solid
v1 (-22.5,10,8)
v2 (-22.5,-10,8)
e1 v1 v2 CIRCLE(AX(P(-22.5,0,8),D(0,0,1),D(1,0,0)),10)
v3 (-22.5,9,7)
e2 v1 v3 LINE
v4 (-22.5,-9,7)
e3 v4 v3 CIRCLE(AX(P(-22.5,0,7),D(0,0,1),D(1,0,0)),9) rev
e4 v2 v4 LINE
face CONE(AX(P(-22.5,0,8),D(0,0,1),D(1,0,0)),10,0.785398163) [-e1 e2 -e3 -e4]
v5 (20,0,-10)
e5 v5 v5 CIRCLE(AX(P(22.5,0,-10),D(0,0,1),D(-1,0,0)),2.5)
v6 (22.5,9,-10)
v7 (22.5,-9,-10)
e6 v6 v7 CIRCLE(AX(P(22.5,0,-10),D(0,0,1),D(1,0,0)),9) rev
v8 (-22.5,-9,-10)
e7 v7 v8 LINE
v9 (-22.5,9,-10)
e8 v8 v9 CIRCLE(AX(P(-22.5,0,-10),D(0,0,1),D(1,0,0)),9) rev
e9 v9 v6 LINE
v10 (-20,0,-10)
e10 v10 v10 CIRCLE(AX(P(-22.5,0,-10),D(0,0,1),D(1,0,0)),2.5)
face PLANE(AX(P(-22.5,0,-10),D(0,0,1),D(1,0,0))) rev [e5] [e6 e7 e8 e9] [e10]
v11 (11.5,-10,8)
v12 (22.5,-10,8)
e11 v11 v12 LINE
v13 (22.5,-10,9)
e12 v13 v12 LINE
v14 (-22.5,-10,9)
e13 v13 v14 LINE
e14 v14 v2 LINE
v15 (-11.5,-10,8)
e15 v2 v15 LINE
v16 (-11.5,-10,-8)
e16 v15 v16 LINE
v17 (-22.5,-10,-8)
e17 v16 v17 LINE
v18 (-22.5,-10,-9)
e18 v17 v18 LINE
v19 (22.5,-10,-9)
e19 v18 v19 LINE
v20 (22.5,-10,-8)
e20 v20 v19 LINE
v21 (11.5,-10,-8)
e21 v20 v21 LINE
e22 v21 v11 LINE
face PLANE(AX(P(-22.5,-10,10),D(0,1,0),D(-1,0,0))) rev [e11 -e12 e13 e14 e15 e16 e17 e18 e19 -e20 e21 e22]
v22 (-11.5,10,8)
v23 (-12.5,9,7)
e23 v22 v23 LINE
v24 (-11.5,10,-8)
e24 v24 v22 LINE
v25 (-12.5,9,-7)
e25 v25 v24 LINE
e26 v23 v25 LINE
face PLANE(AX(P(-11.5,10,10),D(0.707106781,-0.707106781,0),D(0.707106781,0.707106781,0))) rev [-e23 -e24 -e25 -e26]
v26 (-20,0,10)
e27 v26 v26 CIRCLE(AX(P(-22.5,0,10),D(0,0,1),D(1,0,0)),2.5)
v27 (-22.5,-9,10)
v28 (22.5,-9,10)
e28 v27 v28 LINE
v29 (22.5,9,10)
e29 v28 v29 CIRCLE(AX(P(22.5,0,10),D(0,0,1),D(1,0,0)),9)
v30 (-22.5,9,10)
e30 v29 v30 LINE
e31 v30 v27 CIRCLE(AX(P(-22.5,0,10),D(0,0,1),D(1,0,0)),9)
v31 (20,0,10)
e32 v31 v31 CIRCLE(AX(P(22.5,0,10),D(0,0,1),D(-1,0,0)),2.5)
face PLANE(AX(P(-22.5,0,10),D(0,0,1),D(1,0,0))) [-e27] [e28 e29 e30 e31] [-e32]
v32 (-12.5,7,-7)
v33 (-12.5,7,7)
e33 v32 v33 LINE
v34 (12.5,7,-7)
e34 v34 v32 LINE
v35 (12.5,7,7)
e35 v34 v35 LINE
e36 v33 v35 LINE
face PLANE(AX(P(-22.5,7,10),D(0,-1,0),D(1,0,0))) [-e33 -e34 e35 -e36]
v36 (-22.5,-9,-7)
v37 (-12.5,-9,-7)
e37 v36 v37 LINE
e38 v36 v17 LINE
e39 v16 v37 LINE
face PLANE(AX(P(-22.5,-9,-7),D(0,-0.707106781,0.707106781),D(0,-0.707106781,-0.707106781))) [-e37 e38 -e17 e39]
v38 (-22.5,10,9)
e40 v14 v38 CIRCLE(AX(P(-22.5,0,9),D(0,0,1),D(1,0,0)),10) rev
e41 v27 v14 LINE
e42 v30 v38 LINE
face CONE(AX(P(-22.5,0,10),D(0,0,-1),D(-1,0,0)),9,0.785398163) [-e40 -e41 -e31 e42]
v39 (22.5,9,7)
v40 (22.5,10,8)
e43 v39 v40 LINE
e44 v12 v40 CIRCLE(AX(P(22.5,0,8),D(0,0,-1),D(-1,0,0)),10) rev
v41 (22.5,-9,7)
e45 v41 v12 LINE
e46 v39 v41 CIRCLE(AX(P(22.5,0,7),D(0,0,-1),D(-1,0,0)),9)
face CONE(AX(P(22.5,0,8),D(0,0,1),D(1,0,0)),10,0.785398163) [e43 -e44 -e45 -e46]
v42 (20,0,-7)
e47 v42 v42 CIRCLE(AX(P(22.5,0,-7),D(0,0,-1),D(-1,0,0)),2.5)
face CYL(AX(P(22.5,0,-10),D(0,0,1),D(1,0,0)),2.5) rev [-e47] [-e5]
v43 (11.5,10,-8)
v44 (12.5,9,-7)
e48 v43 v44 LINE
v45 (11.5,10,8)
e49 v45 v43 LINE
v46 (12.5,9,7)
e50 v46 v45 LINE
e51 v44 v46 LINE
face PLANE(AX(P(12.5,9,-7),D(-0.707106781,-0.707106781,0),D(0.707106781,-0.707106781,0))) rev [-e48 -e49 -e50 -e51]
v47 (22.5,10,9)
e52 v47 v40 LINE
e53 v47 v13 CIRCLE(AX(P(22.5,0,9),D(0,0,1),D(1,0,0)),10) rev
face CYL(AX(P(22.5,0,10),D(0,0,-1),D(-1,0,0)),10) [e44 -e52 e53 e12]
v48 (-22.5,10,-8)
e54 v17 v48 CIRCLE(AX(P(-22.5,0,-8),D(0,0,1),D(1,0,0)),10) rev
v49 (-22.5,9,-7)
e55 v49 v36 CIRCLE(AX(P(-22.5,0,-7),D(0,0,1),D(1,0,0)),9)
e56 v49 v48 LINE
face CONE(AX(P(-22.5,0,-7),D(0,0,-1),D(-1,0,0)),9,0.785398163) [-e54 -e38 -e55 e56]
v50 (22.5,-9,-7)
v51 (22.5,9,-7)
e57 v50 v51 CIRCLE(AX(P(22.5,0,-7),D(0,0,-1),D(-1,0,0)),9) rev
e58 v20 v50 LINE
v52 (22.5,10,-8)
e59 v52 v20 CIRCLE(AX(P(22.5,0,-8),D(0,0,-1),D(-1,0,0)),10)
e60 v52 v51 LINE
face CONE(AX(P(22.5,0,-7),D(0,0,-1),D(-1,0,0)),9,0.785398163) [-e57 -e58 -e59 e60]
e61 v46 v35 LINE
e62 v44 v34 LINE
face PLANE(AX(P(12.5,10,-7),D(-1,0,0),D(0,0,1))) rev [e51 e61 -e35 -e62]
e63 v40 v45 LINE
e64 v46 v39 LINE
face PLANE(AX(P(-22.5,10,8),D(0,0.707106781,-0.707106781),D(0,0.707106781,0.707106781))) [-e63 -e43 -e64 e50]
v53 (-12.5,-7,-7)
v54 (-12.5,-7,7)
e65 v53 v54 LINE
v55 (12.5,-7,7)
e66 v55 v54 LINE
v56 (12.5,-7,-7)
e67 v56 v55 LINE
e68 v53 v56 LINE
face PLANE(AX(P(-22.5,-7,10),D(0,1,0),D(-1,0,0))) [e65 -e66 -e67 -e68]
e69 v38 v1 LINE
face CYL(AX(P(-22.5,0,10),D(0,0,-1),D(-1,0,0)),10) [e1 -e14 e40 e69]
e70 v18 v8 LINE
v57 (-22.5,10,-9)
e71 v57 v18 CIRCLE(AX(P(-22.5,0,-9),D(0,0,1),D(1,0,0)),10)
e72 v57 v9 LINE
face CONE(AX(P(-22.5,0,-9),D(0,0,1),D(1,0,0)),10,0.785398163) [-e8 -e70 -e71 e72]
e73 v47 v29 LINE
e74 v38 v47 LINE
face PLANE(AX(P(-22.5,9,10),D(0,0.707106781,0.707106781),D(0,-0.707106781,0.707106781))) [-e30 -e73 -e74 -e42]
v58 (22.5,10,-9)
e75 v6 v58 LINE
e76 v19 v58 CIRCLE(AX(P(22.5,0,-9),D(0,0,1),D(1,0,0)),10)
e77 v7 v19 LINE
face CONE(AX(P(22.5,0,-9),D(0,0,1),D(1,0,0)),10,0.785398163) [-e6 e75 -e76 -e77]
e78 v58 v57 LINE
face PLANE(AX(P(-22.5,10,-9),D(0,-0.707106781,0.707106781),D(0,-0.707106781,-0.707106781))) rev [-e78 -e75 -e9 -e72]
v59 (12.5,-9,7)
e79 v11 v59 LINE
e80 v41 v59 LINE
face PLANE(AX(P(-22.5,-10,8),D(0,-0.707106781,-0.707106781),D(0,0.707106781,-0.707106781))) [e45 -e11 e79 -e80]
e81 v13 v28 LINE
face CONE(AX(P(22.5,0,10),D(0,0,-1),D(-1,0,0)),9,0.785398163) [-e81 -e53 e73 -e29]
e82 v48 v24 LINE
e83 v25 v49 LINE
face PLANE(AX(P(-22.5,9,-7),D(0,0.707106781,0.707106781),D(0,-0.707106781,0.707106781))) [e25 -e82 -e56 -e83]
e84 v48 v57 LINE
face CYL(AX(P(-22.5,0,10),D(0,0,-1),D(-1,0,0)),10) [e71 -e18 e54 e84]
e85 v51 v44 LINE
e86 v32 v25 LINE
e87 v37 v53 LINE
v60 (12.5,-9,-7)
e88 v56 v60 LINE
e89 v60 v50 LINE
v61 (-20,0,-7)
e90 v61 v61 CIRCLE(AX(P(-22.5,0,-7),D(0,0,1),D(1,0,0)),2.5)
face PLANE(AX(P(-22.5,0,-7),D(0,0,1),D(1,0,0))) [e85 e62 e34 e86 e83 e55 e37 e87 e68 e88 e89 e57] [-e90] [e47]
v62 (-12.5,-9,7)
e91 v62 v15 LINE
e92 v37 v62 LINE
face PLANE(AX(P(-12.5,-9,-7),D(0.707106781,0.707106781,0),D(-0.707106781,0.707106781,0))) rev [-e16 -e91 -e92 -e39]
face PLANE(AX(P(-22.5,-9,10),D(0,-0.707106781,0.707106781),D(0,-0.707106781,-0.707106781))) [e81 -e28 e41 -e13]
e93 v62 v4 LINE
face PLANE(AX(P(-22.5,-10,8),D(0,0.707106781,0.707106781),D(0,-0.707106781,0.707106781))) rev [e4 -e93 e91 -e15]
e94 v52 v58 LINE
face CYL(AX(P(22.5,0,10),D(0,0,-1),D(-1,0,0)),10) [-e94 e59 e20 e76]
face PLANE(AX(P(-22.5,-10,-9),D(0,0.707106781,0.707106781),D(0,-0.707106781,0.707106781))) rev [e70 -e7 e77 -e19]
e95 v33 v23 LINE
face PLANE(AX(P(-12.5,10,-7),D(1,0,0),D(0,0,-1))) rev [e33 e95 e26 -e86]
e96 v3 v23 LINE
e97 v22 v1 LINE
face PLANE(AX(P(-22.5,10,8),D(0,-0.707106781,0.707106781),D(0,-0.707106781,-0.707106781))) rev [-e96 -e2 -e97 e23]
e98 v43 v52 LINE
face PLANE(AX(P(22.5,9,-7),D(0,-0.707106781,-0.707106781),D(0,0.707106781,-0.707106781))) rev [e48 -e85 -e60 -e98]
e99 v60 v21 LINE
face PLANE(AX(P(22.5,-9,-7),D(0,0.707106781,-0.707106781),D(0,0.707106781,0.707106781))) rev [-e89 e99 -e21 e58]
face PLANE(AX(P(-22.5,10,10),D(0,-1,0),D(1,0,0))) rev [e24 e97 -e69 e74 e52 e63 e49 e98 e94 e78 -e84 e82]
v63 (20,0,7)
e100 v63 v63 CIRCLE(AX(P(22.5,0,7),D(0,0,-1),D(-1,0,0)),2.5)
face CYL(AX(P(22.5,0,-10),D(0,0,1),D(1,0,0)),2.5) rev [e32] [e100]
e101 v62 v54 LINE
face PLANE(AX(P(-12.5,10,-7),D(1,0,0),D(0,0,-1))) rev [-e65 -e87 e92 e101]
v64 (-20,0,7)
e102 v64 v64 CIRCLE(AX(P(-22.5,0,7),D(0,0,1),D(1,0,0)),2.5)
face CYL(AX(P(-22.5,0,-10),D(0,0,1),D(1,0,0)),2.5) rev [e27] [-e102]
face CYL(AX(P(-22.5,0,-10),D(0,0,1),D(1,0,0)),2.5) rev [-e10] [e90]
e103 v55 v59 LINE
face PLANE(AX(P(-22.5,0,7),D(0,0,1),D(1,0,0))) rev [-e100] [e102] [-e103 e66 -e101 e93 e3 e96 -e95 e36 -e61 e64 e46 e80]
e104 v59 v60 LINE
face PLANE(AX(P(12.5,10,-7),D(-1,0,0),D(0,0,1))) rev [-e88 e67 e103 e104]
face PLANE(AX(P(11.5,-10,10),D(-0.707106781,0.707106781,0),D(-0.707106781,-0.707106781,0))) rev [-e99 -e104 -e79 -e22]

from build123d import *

# Parameters (mm, degrees)
BOSS_EXTRUDE1_DEPTH = 10
CUT_EXTRUDE1_DEPTH  = 7
SKETCH3_R           = 2.5
CUT_EXTRUDE2_DEPTH  = 10
CHAMFER2_SIZE       = 1
CHAMFER3_SIZE       = 1
SHELL1_START        = -7
SHELL1_OUTLINE_W    = 25
SHELL1_OUTLINE_H    = 14
SHELL1_DEPTH        = 14
CHAMFER4_SIZE       = 1


# Read off the part's stored shape, not the designer's step: Shell1
with BuildPart() as part:
    # Sketch1 → Boss-Extrude1 (new, symmetric)
    with BuildSketch(Plane.XY):
        with BuildLine():
            Line((-22.5, 10), (22.5, 10))
            ThreePointArc((22.5, 10), (32.5, 0), (22.5, -10))
            Line((22.5, -10), (-22.5, -10))
            ThreePointArc((-22.5, -10), (-32.5, 0), (-22.5, 10))
        make_face()
    extrude(amount=BOSS_EXTRUDE1_DEPTH, both=True)

    # Sketch2 → Cut-Extrude1 (cut, symmetric)
    with BuildSketch(Plane.XY):
        with BuildLine():
            Line((-22.5, 10), (-12.5, 10))
            Line((-12.5, 10), (-12.5, -10))
            Line((-12.5, -10), (-22.5, -10))
            ThreePointArc((-22.5, -10), (-32.5, 0), (-22.5, 10))
        make_face()
        with BuildLine():
            Line((12.5, -10), (22.5, -10))
            ThreePointArc((22.5, -10), (32.5, 0), (22.5, 10))
            Line((22.5, 10), (12.5, 10))
            Line((12.5, 10), (12.5, -10))
        make_face()
    extrude(amount=CUT_EXTRUDE1_DEPTH, both=True, mode=Mode.SUBTRACT)

    # Sketch3 → Cut-Extrude2 (cut, symmetric)
    with BuildSketch(Plane.XY):
        with Locations((-22.5, 0)):
            Circle(SKETCH3_R)
        with Locations(Location((22.5, 0, 0), (0, 0, 180))):
            Circle(SKETCH3_R)
    extrude(amount=CUT_EXTRUDE2_DEPTH, both=True, mode=Mode.SUBTRACT)

    # Chamfer2
    chamfer2_edges = [part.edges().sort_by_distance(p)[0] for p in [
        (-32.5, 0, -7),
        (-17.5, 10, -7),
        (-17.5, -10, -7),
        (-32.5, 0, 7),
        (-17.5, -10, 7),
        (-17.5, 10, 7),
        (32.5, 0, -7),
        (17.5, -10, -7),
        (17.5, 10, -7),
        (32.5, 0, 7),
        (17.5, 10, 7),
        (17.5, -10, 7),
    ]]
    chamfer(chamfer2_edges, length=CHAMFER2_SIZE)

    # Chamfer3
    chamfer3_edges = [part.edges().sort_by_distance(p)[0] for p in [
        (32.5, 0, 10),
        (0, 10, 10),
        (-32.5, 0, 10),
        (0, 10, -10),
        (32.5, 0, -10),
        (0, -10, -10),
        (-32.5, 0, -10),
        (0, -10, 10),
    ]]
    chamfer(chamfer3_edges, length=CHAMFER3_SIZE)

    # Shell1 outline → Shell1 (cut)
    with BuildSketch(Plane.XY.offset(SHELL1_START)):
        Rectangle(SHELL1_OUTLINE_W, SHELL1_OUTLINE_H)
    extrude(amount=SHELL1_DEPTH, mode=Mode.SUBTRACT)

    # Chamfer4
    chamfer4_edges = [part.edges().sort_by_distance(p)[0] for p in [
        (12.5, -10, 0),
        (12.5, 10, 0),
        (-12.5, -10, 0),
        (-12.5, 10, 0),
    ]]
    chamfer(chamfer4_edges, length=CHAMFER4_SIZE)


solid = part.part
